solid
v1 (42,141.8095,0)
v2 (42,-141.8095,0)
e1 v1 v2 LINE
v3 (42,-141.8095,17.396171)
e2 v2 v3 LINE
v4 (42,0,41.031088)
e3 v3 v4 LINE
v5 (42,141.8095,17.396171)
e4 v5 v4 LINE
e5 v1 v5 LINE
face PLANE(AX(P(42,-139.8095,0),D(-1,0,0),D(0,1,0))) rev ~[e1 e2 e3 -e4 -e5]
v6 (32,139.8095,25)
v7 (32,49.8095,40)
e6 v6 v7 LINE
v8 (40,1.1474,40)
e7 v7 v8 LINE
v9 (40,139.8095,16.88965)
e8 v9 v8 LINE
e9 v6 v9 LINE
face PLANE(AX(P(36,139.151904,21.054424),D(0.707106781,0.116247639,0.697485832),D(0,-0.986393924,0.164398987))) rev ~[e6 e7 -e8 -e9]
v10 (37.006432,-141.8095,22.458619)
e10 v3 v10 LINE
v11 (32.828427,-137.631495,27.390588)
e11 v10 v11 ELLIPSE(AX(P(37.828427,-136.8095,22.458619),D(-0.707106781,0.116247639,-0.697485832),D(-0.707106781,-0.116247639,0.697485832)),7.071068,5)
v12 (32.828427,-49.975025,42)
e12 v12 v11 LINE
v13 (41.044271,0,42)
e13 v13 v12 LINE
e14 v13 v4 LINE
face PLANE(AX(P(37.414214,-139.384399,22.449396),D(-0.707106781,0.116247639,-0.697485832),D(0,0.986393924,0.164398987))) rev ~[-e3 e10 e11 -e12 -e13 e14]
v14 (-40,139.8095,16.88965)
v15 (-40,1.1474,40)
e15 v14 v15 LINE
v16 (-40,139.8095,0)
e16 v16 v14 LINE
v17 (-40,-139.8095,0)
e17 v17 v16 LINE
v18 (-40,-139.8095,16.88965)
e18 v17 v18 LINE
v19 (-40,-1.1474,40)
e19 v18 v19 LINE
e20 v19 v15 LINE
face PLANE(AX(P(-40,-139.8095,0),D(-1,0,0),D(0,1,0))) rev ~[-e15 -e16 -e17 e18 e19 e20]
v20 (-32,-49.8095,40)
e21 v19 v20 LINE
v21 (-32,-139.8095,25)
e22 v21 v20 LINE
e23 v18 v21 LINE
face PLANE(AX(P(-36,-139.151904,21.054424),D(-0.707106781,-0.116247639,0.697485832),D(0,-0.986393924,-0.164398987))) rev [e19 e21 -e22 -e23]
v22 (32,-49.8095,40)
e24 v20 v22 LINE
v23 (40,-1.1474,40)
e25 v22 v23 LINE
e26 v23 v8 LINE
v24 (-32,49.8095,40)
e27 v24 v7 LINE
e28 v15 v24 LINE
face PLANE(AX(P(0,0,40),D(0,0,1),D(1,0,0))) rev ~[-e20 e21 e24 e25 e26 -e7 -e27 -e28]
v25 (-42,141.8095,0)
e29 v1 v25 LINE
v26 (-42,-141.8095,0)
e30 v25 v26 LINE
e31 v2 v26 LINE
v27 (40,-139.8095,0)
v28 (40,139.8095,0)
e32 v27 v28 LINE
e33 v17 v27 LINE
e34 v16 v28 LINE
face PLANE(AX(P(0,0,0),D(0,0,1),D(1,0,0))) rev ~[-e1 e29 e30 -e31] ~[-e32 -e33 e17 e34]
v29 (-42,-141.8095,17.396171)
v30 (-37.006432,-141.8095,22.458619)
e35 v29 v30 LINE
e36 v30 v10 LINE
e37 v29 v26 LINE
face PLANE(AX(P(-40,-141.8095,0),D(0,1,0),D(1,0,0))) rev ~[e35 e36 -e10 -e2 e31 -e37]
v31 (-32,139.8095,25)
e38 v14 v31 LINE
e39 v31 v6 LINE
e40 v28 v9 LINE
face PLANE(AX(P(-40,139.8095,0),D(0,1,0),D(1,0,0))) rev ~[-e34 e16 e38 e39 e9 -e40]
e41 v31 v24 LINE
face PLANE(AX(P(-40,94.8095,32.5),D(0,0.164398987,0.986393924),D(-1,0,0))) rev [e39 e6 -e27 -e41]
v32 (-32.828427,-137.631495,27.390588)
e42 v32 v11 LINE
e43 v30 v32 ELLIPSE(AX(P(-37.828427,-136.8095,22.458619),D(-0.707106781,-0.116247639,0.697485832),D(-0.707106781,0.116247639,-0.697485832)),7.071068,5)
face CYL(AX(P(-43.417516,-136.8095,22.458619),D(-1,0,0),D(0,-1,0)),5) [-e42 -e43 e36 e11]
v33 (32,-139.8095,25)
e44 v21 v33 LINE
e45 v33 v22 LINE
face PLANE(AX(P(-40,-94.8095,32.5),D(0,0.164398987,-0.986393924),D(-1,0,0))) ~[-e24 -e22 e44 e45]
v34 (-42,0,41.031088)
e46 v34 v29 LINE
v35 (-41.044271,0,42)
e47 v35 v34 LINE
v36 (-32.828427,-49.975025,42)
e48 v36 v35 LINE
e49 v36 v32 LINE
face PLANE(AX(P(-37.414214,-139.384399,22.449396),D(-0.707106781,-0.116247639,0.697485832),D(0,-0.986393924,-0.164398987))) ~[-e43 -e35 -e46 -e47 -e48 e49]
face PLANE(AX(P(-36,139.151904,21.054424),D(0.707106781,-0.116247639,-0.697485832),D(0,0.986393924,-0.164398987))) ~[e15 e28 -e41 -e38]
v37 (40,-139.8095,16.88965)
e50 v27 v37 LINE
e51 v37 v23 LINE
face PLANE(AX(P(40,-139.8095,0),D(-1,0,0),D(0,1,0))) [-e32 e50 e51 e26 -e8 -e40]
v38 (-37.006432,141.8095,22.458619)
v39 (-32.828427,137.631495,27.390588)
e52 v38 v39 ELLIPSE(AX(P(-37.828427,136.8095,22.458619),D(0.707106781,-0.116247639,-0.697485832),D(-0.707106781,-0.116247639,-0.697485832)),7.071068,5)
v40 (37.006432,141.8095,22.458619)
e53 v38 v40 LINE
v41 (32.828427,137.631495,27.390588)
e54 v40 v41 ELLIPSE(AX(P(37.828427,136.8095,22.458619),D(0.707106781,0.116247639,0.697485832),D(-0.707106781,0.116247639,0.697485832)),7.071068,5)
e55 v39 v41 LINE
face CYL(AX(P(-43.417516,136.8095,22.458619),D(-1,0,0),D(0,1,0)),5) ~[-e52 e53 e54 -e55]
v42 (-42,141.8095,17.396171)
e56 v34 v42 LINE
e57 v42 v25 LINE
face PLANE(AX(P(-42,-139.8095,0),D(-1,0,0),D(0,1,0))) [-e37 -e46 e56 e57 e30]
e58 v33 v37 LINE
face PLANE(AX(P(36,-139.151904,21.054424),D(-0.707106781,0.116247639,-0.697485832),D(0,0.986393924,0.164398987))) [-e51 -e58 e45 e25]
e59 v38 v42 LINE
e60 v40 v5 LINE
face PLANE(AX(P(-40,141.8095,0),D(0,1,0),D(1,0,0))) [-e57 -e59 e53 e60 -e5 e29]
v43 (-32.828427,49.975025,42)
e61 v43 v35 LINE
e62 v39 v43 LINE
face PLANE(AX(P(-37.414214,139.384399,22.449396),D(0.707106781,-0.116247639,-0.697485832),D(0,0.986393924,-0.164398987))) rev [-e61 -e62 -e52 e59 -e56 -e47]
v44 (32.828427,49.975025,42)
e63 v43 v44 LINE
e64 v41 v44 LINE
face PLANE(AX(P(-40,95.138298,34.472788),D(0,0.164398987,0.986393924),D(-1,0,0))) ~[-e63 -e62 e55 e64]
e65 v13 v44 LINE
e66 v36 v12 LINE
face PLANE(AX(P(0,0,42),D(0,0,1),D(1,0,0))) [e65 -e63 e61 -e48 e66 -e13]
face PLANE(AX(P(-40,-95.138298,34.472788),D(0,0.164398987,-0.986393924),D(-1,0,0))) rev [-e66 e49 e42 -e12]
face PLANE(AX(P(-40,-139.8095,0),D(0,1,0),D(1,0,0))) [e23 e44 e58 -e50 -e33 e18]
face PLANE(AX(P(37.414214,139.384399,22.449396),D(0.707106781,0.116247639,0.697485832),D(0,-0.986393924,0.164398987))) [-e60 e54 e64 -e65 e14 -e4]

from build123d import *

# Parameters (mm, degrees)
F0_W        = 80
F0_H        = 279.619
F1_DEPTH    = 40
F2_SIZE2    = 90
F2_SIZE     = 15
F2_2_SIZE2  = 90
F2_2_SIZE   = 15
F3_SIZE     = 8
F4_T        = 2
F5_T1_DEPTH = 86.8350314591


# Not quite as in the source:
# - a fillet or chamfer that OpenCascade refuses, or shapes differently, is made with other operations: its cross-section is extruded or revolved along the edge and cut away or added


with BuildPart() as f1:
    # F0 (on Top) → F1 (new body)
    with BuildSketch(Plane.XY):
        Rectangle(F0_W, F0_H)
    extrude(amount=F1_DEPTH)

    # F2
    f2_edges = [f1.edges().sort_by_distance(p)[0] for p in [
        (0, 139.8095, 40),
    ]]
    f2_side = f1.faces().sort_by_distance((0, 139.8095, 20))[0]
    chamfer(f2_edges, length=F2_SIZE, length2=F2_SIZE2, reference=f2_side)

    # F2#2
    f2_2_edges = [f1.edges().sort_by_distance(p)[0] for p in [
        (0, -139.8095, 40),
    ]]
    f2_2_side = f1.faces().sort_by_distance((0, -139.8095, 20))[0]
    chamfer(f2_2_edges, length=F2_2_SIZE, length2=F2_2_SIZE2, reference=f2_2_side)

    # F3
    f3_edges = [f1.edges().sort_by_distance(p)[0] for p in [
        (-40, -94.8095, 32.5),
        (40, -94.8095, 32.5),
        (40, 94.8095, 32.5),
        (-40, 94.8095, 32.5),
    ]]
    chamfer(f3_edges, length=F3_SIZE)

    # F4
    f4_openings = [f1.faces().sort_by_distance(p)[0] for p in [
        (0, 0, 0),
    ]]
    offset(amount=F4_T, openings=f4_openings, kind=Kind.INTERSECTION)

    # F5: fillet of radius 5 on 2 edges, made by hand

    # F5_s2 → F5_t1 (cut)
    with BuildSketch(Plane.YZ.offset(-43.4175157295)):
        with BuildLine():
            ThreePointArc((-141.8095, 22.4586187349), (-140.6245999124, 25.6904932155), (-137.6314949365, 27.390588354))
            Line((-137.6314949365, 27.390588354), (-141.8095, 26.6942541768))
            Line((-141.8095, 26.6942541768), (-141.8095, 22.4586187349))
        make_face()
        with BuildLine():
            ThreePointArc((141.8095, 22.4586187349), (140.6245999124, 25.6904932155), (137.6314949365, 27.390588354))
            Line((137.6314949365, 27.390588354), (141.8095, 26.6942541768))
            Line((141.8095, 26.6942541768), (141.8095, 22.4586187349))
        make_face()
    extrude(amount=F5_T1_DEPTH, mode=Mode.SUBTRACT)


solid = f1.part
